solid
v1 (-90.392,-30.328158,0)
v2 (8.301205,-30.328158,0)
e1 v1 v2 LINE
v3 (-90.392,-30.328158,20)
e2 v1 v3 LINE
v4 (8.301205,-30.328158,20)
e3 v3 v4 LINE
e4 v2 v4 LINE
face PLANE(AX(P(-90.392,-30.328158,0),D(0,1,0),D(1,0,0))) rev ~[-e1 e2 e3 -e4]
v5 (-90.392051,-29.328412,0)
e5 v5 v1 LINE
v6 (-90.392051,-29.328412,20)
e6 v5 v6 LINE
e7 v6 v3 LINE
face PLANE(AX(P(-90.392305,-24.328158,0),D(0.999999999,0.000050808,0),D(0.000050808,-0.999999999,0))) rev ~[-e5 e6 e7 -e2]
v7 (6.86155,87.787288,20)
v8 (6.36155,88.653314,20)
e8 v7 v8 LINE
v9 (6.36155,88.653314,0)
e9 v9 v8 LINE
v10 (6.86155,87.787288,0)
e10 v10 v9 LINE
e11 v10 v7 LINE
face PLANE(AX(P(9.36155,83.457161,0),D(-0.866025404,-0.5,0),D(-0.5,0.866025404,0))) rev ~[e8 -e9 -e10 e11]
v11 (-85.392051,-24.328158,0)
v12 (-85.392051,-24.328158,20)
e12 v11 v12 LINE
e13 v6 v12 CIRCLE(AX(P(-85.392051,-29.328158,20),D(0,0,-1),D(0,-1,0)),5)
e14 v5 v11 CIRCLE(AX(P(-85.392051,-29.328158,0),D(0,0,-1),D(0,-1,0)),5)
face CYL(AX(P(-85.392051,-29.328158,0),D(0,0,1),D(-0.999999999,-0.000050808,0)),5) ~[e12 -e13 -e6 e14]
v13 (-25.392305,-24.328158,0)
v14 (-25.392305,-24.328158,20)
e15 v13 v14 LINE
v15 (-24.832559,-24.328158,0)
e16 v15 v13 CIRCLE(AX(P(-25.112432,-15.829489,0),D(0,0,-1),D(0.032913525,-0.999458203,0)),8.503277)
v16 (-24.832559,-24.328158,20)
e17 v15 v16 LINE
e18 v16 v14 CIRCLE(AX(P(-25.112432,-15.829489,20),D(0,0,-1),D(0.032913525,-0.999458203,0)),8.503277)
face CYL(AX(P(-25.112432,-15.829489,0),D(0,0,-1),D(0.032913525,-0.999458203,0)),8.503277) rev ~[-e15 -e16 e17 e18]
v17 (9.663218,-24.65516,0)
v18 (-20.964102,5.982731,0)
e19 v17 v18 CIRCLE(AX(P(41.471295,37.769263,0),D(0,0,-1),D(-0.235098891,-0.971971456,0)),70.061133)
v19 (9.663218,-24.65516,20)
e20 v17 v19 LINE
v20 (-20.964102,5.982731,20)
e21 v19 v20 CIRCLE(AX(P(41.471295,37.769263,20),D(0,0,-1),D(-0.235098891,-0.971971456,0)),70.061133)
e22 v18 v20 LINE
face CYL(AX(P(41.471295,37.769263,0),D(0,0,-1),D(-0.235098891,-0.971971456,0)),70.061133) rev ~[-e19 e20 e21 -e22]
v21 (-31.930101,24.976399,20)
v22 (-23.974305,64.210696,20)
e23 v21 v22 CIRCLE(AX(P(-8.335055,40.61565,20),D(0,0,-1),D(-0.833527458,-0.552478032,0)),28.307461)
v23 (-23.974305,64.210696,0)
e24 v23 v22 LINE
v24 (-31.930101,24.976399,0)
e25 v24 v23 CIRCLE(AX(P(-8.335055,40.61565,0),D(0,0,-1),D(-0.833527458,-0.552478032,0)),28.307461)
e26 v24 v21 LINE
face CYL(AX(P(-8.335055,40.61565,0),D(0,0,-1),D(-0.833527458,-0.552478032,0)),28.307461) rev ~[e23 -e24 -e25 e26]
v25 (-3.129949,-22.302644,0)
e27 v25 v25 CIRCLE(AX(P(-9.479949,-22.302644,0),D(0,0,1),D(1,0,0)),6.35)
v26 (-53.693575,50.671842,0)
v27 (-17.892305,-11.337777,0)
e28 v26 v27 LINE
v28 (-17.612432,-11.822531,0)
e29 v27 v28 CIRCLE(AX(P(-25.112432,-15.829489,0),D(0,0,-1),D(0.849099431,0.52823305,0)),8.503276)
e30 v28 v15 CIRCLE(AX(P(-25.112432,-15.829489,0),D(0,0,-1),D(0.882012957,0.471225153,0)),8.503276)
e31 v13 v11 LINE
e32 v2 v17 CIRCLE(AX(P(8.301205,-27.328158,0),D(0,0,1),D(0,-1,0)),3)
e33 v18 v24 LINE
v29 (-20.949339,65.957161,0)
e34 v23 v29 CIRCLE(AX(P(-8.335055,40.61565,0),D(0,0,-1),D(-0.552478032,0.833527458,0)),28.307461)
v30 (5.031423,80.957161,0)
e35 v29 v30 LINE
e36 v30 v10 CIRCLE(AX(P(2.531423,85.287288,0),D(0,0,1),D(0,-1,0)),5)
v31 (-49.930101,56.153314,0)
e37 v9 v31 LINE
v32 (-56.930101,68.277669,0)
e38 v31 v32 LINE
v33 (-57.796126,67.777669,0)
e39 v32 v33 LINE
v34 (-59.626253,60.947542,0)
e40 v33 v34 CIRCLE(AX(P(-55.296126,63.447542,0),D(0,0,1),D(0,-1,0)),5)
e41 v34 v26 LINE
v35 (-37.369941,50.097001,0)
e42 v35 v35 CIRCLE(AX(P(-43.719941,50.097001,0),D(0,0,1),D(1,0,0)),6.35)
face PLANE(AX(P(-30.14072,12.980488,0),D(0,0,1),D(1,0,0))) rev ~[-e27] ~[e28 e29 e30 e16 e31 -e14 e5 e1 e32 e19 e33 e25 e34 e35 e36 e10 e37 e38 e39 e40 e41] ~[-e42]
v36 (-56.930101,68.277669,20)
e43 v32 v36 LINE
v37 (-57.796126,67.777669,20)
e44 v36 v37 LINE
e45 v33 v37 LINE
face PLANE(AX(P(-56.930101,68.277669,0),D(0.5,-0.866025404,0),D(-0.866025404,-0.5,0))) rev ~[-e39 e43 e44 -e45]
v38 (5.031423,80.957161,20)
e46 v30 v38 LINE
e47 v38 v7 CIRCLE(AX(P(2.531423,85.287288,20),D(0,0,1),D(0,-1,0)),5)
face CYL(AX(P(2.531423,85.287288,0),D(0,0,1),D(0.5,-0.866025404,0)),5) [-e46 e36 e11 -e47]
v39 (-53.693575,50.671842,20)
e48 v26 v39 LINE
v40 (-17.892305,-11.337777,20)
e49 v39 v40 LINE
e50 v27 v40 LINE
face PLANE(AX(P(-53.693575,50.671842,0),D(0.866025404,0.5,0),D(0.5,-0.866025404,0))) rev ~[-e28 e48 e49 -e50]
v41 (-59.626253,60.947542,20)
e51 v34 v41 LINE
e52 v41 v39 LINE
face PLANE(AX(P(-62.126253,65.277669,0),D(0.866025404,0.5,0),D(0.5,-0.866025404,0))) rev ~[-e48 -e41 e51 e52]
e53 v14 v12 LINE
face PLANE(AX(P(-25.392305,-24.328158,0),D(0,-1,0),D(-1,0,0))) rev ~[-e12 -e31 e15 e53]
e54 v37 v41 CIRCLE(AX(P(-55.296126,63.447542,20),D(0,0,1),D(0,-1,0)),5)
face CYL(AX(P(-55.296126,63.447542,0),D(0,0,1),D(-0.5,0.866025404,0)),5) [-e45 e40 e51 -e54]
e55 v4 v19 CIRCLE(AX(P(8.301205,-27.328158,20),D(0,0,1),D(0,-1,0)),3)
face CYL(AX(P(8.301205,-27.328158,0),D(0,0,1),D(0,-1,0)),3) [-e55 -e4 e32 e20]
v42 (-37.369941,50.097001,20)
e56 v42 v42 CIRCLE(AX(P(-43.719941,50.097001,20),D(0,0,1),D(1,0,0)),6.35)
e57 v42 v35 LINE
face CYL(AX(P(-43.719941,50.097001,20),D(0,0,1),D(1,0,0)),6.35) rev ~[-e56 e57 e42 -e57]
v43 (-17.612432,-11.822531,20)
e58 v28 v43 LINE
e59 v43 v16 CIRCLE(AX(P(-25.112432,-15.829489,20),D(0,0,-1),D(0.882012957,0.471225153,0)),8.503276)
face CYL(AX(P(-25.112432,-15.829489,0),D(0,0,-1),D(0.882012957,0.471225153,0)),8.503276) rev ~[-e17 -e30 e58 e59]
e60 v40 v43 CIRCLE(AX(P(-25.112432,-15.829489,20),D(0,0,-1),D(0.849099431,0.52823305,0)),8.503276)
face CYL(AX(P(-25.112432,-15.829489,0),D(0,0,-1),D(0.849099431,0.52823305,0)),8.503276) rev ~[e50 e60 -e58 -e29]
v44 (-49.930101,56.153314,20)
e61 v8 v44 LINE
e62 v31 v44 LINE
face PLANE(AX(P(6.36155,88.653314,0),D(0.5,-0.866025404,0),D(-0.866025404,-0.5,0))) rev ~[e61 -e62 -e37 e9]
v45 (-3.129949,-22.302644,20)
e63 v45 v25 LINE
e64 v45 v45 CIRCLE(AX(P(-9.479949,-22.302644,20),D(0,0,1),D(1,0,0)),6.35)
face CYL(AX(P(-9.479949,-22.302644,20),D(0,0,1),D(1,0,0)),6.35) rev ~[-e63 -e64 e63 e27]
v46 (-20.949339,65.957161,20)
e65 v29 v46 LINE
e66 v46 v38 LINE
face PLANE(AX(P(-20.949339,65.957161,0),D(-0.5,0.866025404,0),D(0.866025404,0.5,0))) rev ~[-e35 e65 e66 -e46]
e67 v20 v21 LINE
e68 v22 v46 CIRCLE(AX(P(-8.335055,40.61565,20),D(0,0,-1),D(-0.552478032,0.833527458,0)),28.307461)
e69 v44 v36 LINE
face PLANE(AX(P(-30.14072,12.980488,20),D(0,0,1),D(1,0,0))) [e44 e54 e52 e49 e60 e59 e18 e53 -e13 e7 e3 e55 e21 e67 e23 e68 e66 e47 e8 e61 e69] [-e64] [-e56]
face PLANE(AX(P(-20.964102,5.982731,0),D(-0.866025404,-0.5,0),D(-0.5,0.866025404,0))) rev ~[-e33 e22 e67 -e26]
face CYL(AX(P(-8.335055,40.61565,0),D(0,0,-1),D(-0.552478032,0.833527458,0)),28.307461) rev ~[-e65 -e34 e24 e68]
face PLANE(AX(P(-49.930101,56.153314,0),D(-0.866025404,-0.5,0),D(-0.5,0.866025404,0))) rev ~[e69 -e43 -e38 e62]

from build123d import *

# Parameters (mm, degrees)
F1_DEPTH = 20
F2_R     = 5
F3_R     = 6.35
F4_DEPTH = 25
F5_R     = 3


# Not quite as in the source:
# - a feature names something its author has since deleted; it is built from what else it names


with BuildPart() as f1:
    # F0 (on Top) → F1 (new body)
    with BuildSketch(Plane.XY):
        with BuildLine():
            Line((-90.3923048454, -24.3281582892), (-90.392, -30.3281582892))
            Line((-90.392, -30.3281582892), (0, -30.3281582892))
            Line((0, -30.3281582892), (25, -30.3281582892))
            ThreePointArc((25, -30.3281582892), (-1.9589555892, -17.2068745453), (-20.9641016151, 5.9827308433))
            Line((-20.9641016151, 5.9827308433), (-31.9301010618, 24.9763990407))
            ThreePointArc((-31.9301010618, 24.9763990407), (-36.0778921244, 46.2412468008), (-23.9743052597, 64.2106960401))
            ThreePointArc((-23.9743052597, 64.2106960401), (-22.4887853878, 65.1306303747), (-20.9493389483, 65.9571611543))
            Line((-20.9493389483, 65.9571611543), (9.3615501841, 83.4571611543))
            Line((9.3615501841, 83.4571611543), (6.3615501841, 88.653313577))
            Line((6.3615501841, 88.653313577), (-49.9301010618, 56.153313577))
            Line((-49.9301010618, 56.153313577), (-56.9301010618, 68.2776692299))
            Line((-56.9301010618, 68.2776692299), (-62.1262534846, 65.2776692299))
            Line((-62.1262534846, 65.2776692299), (-53.6935750346, 50.6718417108))
            Line((-53.6935750346, 50.6718417108), (-17.8923048454, -11.3377772324))
            ThreePointArc((-17.8923048454, -11.3377772324), (-17.7483786227, -11.5778506661), (-17.6124320417, -11.8225311482))
            Line((-17.6124320417, -11.8225311482), (-10.3923048454, -24.3281582892))
            Line((-10.3923048454, -24.3281582892), (-24.8325592379, -24.3281582892))
            ThreePointArc((-24.8325592379, -24.3281582892), (-25.1124320417, -24.3327653375), (-25.3923048454, -24.3281582892))
            Line((-25.3923048454, -24.3281582892), (-90.3923048454, -24.3281582892))
        make_face()
        with BuildLine():
            ThreePointArc((-17.6124320417, -11.8225311482), (-17.7483786227, -20.0811271137), (-24.8325592379, -24.3281582892))
            Line((-24.8325592379, -24.3281582892), (-10.3923048454, -24.3281582892))
            Line((-10.3923048454, -24.3281582892), (-17.6124320417, -11.8225311482))
        make_face()
    extrude(amount=F1_DEPTH)

    # F2
    f2_edges = [f1.edges().sort_by_distance(p)[0] for p in [
        (-90.392305, -24.328158, 10),
        (-62.126253, 65.277669, 10),
        (9.36155, 83.457161, 10),
    ]]
    fillet(f2_edges, radius=F2_R)

    # F3 (on face) → F4 (cut)
    with BuildSketch(Plane.XY.offset(20)):
        with Locations((-43.719941363, 50.0970014554)):
            Circle(F3_R)
        with Locations((-9.4799492508, -22.3026443273)):
            Circle(F3_R)
    extrude(amount=-F4_DEPTH, mode=Mode.SUBTRACT)

    # F5
    f5_edges = [f1.edges().sort_by_distance(p)[0] for p in [
        (25, -30.328158, 10),
    ]]
    fillet(f5_edges, radius=F5_R)


solid = f1.part
